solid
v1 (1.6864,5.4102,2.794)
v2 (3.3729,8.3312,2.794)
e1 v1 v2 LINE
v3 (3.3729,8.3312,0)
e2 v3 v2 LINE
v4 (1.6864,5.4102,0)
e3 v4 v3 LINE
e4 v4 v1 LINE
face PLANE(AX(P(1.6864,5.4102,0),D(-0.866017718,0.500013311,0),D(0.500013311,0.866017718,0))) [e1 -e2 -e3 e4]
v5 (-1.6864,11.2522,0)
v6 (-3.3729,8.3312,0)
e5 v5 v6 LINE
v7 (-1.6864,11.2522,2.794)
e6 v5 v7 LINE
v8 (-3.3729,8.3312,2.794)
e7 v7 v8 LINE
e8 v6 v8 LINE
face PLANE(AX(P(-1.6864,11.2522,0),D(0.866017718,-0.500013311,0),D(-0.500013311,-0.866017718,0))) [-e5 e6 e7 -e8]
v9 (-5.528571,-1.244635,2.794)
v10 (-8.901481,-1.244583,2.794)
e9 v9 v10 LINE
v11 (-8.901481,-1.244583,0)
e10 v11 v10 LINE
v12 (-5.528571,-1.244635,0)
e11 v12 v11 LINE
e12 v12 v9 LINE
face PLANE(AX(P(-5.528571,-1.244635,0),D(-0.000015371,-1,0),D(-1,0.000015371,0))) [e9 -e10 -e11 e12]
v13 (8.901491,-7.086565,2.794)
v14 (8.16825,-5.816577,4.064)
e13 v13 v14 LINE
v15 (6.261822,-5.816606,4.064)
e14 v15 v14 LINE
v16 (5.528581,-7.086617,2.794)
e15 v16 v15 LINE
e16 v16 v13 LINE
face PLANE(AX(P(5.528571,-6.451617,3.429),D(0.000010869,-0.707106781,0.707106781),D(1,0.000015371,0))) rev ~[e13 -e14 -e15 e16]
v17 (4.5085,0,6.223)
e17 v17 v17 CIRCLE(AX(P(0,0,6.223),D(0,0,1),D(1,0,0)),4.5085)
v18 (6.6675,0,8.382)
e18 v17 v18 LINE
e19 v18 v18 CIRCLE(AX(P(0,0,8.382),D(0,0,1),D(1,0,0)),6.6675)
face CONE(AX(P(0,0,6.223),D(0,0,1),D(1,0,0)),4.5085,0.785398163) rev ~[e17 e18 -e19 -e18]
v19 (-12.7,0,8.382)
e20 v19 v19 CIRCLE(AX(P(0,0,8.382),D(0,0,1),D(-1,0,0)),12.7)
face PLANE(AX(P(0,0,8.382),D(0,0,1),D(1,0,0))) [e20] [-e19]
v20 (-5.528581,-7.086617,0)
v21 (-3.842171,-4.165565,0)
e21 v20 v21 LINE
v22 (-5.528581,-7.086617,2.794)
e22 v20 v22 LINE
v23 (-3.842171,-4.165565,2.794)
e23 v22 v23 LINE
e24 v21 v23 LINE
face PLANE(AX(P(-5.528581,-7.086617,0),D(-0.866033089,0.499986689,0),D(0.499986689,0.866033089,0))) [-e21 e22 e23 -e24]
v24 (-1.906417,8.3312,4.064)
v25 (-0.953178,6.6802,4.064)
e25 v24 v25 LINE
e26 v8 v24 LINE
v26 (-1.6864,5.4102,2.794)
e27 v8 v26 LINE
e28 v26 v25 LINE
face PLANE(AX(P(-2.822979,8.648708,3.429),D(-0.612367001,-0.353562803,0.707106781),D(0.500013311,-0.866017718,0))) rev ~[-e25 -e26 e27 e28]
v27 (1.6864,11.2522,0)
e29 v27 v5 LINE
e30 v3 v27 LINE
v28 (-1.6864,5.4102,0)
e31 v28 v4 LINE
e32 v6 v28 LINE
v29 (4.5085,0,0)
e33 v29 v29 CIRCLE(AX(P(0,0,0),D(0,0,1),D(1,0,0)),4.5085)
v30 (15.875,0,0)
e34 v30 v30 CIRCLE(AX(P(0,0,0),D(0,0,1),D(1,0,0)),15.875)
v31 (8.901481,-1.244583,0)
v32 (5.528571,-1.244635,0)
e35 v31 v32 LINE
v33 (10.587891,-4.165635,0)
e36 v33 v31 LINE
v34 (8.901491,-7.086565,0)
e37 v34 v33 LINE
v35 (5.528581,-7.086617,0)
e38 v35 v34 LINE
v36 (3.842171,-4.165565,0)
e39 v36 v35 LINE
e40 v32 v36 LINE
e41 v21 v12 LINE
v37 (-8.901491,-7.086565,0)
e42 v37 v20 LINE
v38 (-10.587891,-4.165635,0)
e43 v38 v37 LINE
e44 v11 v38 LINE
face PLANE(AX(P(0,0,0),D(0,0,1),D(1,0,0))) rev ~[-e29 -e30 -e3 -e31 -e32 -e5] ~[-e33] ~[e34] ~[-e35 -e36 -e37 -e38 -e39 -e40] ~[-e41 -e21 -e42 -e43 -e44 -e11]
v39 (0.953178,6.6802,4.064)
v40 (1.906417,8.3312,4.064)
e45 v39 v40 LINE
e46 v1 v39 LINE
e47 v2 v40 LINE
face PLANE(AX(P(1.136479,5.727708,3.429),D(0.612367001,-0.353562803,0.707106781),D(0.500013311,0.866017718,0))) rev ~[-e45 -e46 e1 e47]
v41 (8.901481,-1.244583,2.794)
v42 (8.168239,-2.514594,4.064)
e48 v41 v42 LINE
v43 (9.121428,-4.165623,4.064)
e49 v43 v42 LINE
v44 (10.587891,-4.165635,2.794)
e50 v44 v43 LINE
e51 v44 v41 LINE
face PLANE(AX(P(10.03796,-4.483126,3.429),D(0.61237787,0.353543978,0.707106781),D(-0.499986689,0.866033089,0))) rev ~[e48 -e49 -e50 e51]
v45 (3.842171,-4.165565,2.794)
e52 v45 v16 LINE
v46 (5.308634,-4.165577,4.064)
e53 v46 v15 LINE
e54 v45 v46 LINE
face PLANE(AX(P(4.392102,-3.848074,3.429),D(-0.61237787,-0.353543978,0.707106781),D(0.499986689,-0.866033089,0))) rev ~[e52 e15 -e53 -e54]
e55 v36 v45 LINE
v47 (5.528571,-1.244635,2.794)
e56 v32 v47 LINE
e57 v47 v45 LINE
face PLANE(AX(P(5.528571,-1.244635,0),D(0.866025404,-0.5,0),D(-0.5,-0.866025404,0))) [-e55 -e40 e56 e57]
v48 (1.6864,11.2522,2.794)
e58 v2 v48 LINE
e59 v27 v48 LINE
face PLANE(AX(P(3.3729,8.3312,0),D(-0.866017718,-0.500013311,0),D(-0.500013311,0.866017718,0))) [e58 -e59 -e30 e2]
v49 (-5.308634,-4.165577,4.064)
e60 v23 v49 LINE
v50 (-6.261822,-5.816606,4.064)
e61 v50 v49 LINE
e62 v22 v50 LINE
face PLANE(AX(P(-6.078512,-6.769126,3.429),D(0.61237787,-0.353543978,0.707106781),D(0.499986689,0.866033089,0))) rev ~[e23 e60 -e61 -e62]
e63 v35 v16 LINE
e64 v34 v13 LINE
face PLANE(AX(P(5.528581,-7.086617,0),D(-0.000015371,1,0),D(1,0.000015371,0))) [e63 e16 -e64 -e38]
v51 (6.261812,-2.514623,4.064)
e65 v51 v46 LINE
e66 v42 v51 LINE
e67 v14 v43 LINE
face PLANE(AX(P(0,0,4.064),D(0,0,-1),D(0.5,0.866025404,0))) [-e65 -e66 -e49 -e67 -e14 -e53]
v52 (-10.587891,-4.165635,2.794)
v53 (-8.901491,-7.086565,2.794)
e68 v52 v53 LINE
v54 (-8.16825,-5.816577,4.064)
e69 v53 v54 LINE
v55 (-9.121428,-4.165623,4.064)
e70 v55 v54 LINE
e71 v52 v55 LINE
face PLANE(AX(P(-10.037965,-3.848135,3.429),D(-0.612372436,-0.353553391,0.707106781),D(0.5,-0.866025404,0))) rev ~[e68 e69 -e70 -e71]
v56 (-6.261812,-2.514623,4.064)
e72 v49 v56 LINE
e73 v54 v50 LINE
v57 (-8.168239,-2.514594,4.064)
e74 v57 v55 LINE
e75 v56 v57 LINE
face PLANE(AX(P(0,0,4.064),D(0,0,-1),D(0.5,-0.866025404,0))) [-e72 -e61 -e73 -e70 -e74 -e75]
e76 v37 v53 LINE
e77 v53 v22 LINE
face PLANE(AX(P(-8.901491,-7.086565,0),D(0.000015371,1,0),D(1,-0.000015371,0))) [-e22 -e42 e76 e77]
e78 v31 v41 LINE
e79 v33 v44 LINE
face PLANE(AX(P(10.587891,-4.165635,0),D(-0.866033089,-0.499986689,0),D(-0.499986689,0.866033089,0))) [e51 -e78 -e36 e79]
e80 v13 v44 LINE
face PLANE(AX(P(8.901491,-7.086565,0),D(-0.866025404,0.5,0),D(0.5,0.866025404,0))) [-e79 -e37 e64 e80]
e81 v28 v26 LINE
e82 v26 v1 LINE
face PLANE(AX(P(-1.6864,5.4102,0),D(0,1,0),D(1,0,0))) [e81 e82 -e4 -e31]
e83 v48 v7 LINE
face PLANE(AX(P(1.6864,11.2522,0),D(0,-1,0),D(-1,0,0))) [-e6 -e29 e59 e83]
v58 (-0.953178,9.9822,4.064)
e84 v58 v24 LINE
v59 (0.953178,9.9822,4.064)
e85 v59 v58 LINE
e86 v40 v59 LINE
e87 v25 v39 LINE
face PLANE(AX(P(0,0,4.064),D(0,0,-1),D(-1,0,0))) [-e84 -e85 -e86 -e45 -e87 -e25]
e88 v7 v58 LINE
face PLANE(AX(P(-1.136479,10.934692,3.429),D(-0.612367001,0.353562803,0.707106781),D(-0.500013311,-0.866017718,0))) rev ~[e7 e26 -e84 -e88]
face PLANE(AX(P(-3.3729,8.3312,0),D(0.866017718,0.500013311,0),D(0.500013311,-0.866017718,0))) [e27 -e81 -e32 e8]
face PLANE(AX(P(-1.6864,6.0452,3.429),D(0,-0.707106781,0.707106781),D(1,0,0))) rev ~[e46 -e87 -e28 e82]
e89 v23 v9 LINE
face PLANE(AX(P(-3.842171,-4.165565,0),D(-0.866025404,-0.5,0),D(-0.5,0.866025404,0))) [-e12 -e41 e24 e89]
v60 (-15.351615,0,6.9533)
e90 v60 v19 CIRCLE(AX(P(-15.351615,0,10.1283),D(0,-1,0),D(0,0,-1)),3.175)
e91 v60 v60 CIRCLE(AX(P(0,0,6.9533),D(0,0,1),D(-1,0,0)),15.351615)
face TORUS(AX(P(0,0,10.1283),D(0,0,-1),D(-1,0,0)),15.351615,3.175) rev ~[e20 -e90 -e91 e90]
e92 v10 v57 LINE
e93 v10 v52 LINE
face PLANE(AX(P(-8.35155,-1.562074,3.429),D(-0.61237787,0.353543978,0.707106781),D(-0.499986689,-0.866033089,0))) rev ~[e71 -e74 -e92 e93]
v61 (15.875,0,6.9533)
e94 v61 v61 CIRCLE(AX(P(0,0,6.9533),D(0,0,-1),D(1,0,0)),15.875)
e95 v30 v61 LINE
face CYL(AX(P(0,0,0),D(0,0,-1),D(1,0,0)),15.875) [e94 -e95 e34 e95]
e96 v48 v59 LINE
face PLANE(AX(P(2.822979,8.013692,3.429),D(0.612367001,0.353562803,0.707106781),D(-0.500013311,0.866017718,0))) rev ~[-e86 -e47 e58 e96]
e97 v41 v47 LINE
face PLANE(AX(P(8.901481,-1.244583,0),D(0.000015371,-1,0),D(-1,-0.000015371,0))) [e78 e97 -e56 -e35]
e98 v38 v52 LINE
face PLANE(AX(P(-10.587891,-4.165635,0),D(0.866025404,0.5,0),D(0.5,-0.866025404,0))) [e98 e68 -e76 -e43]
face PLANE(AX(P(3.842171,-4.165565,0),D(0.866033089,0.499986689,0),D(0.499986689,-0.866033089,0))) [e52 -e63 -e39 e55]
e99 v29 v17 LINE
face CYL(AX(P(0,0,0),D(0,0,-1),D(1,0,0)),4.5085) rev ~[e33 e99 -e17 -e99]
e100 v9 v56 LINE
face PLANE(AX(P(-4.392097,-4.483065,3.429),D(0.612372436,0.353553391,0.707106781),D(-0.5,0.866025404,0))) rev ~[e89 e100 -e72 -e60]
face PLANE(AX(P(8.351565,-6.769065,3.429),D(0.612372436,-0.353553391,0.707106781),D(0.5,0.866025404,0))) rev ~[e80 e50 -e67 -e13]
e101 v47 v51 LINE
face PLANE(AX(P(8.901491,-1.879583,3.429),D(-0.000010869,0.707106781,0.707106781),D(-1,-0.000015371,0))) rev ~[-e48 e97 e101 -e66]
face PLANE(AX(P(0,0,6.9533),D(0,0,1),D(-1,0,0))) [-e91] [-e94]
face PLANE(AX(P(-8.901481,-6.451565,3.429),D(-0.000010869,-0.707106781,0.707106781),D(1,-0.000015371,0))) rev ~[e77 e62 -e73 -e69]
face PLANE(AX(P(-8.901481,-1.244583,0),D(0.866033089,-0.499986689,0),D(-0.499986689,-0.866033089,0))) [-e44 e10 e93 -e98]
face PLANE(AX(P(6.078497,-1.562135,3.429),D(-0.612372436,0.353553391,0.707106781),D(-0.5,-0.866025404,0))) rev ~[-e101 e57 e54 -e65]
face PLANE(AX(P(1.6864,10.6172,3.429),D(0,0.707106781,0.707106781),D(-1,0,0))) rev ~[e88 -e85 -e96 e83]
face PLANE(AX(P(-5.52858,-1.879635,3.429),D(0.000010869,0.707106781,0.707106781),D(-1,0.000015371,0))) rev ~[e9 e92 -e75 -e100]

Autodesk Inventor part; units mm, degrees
ref_plane "YZ Plane" through (0, 0, 0) normal (1, 0, 0) x (0, 1, 0)
ref_plane "XZ Plane" through (0, 0, 0) normal (0, 1, 0) x (-1, 0, 0)
ref_plane "XY Plane" through (0, 0, 0) normal (0, 0, 1) x (1, 0, 0)
sketch "Sketch2" plane through (0, 0, 0) normal (0, 0, 1) x (1, 0, 0)
  circle A0 centre (0, 0) radius 4.5085
  circle A1 centre (0, 0) radius 15.875
  dimension "d3" = 9.017
  dimension "d4" = 31.75
extrude "Extrusion2" add sketch "Sketch2" along normal blind 8.382
chamfer "Chamfer1" distance 2.159 angle 45 1 edges at (-4.5085, 0, 8.382)
sketch "Sketch6" plane through (0, 0, 0) normal (0, 1, 0) x (-1, 0, 0)
  line L0 (15.875, 8.382) -> (-15.875, 8.382) projected
  line L1 (-15.875, 0) -> (15.875, 0) projected
  line L2 (15.875, 8.382) -> (12.7, 8.382)
  line L3 (15.875, 8.382) -> (-15.875, 8.382) projected
  line L4 (15.875, 8.382) -> (15.875, 6.9533)
  line L5 (15.875, 0) -> (15.875, 8.382) projected
  line L6 (15.875, 6.9533) -> (13.335, 6.9533)
  line L7 (13.335, 6.9533) -> (12.7, 8.382)
  line L8 (0, 0) -> (0, 8.967)
  dimension "d21" = 3.175
  dimension "d22" = 1.4287
  dimension "d23" = 2.54
revolve "Revolution1" cut sketch "Sketch6" angle 360 about axis through (0, 0, 0) along (0, 0, 1) contours L4 L6 L7 L0
sketch "Sketch7" plane through (0, 0, 0) normal (0, 0, -1) x (-1, 0, 0)
  line L0 (-3.3729, 8.3312) -> (-1.6864, 11.2522)
  line L1 (-1.6864, 11.2522) -> (1.6864, 11.2522)
  line L2 (1.6864, 11.2522) -> (3.3729, 8.3312)
  line L3 (3.3729, 8.3312) -> (1.6864, 5.4102)
  line L4 (1.6864, 5.4102) -> (-1.6864, 5.4102)
  line L5 (-1.6864, 5.4102) -> (-3.3729, 8.3312)
  point P0 (0, 0)
  point P1 (0, 8.3312)
  dimension "d27" = 8.3312
  dimension "d28" = 5.842
extrude "Extrusion4" cut sketch "Sketch7" against normal blind 4.064
chamfer "Chamfer3" distance 1.27 angle 45 6 edges at (2.5297, 9.7917, 4.064) (0, 11.2522, 4.064) (-2.5297, 9.7917, 4.064) (-2.5297, 6.8707, 4.064) (0, 5.4102, 4.064) (2.5297, 6.8707, 4.064)
pattern_circular "Circular Pattern1" count 3 over 360 about axis through (0, 0, 0) along (0, 0, 1) of "Extrusion4", "Chamfer3"
fillet "Fillet3" radius 3.175 1 edges at (13.335, 0, 6.9533)
properties part number "SpurGearThrustDistributer" material "ABS Plastic"
